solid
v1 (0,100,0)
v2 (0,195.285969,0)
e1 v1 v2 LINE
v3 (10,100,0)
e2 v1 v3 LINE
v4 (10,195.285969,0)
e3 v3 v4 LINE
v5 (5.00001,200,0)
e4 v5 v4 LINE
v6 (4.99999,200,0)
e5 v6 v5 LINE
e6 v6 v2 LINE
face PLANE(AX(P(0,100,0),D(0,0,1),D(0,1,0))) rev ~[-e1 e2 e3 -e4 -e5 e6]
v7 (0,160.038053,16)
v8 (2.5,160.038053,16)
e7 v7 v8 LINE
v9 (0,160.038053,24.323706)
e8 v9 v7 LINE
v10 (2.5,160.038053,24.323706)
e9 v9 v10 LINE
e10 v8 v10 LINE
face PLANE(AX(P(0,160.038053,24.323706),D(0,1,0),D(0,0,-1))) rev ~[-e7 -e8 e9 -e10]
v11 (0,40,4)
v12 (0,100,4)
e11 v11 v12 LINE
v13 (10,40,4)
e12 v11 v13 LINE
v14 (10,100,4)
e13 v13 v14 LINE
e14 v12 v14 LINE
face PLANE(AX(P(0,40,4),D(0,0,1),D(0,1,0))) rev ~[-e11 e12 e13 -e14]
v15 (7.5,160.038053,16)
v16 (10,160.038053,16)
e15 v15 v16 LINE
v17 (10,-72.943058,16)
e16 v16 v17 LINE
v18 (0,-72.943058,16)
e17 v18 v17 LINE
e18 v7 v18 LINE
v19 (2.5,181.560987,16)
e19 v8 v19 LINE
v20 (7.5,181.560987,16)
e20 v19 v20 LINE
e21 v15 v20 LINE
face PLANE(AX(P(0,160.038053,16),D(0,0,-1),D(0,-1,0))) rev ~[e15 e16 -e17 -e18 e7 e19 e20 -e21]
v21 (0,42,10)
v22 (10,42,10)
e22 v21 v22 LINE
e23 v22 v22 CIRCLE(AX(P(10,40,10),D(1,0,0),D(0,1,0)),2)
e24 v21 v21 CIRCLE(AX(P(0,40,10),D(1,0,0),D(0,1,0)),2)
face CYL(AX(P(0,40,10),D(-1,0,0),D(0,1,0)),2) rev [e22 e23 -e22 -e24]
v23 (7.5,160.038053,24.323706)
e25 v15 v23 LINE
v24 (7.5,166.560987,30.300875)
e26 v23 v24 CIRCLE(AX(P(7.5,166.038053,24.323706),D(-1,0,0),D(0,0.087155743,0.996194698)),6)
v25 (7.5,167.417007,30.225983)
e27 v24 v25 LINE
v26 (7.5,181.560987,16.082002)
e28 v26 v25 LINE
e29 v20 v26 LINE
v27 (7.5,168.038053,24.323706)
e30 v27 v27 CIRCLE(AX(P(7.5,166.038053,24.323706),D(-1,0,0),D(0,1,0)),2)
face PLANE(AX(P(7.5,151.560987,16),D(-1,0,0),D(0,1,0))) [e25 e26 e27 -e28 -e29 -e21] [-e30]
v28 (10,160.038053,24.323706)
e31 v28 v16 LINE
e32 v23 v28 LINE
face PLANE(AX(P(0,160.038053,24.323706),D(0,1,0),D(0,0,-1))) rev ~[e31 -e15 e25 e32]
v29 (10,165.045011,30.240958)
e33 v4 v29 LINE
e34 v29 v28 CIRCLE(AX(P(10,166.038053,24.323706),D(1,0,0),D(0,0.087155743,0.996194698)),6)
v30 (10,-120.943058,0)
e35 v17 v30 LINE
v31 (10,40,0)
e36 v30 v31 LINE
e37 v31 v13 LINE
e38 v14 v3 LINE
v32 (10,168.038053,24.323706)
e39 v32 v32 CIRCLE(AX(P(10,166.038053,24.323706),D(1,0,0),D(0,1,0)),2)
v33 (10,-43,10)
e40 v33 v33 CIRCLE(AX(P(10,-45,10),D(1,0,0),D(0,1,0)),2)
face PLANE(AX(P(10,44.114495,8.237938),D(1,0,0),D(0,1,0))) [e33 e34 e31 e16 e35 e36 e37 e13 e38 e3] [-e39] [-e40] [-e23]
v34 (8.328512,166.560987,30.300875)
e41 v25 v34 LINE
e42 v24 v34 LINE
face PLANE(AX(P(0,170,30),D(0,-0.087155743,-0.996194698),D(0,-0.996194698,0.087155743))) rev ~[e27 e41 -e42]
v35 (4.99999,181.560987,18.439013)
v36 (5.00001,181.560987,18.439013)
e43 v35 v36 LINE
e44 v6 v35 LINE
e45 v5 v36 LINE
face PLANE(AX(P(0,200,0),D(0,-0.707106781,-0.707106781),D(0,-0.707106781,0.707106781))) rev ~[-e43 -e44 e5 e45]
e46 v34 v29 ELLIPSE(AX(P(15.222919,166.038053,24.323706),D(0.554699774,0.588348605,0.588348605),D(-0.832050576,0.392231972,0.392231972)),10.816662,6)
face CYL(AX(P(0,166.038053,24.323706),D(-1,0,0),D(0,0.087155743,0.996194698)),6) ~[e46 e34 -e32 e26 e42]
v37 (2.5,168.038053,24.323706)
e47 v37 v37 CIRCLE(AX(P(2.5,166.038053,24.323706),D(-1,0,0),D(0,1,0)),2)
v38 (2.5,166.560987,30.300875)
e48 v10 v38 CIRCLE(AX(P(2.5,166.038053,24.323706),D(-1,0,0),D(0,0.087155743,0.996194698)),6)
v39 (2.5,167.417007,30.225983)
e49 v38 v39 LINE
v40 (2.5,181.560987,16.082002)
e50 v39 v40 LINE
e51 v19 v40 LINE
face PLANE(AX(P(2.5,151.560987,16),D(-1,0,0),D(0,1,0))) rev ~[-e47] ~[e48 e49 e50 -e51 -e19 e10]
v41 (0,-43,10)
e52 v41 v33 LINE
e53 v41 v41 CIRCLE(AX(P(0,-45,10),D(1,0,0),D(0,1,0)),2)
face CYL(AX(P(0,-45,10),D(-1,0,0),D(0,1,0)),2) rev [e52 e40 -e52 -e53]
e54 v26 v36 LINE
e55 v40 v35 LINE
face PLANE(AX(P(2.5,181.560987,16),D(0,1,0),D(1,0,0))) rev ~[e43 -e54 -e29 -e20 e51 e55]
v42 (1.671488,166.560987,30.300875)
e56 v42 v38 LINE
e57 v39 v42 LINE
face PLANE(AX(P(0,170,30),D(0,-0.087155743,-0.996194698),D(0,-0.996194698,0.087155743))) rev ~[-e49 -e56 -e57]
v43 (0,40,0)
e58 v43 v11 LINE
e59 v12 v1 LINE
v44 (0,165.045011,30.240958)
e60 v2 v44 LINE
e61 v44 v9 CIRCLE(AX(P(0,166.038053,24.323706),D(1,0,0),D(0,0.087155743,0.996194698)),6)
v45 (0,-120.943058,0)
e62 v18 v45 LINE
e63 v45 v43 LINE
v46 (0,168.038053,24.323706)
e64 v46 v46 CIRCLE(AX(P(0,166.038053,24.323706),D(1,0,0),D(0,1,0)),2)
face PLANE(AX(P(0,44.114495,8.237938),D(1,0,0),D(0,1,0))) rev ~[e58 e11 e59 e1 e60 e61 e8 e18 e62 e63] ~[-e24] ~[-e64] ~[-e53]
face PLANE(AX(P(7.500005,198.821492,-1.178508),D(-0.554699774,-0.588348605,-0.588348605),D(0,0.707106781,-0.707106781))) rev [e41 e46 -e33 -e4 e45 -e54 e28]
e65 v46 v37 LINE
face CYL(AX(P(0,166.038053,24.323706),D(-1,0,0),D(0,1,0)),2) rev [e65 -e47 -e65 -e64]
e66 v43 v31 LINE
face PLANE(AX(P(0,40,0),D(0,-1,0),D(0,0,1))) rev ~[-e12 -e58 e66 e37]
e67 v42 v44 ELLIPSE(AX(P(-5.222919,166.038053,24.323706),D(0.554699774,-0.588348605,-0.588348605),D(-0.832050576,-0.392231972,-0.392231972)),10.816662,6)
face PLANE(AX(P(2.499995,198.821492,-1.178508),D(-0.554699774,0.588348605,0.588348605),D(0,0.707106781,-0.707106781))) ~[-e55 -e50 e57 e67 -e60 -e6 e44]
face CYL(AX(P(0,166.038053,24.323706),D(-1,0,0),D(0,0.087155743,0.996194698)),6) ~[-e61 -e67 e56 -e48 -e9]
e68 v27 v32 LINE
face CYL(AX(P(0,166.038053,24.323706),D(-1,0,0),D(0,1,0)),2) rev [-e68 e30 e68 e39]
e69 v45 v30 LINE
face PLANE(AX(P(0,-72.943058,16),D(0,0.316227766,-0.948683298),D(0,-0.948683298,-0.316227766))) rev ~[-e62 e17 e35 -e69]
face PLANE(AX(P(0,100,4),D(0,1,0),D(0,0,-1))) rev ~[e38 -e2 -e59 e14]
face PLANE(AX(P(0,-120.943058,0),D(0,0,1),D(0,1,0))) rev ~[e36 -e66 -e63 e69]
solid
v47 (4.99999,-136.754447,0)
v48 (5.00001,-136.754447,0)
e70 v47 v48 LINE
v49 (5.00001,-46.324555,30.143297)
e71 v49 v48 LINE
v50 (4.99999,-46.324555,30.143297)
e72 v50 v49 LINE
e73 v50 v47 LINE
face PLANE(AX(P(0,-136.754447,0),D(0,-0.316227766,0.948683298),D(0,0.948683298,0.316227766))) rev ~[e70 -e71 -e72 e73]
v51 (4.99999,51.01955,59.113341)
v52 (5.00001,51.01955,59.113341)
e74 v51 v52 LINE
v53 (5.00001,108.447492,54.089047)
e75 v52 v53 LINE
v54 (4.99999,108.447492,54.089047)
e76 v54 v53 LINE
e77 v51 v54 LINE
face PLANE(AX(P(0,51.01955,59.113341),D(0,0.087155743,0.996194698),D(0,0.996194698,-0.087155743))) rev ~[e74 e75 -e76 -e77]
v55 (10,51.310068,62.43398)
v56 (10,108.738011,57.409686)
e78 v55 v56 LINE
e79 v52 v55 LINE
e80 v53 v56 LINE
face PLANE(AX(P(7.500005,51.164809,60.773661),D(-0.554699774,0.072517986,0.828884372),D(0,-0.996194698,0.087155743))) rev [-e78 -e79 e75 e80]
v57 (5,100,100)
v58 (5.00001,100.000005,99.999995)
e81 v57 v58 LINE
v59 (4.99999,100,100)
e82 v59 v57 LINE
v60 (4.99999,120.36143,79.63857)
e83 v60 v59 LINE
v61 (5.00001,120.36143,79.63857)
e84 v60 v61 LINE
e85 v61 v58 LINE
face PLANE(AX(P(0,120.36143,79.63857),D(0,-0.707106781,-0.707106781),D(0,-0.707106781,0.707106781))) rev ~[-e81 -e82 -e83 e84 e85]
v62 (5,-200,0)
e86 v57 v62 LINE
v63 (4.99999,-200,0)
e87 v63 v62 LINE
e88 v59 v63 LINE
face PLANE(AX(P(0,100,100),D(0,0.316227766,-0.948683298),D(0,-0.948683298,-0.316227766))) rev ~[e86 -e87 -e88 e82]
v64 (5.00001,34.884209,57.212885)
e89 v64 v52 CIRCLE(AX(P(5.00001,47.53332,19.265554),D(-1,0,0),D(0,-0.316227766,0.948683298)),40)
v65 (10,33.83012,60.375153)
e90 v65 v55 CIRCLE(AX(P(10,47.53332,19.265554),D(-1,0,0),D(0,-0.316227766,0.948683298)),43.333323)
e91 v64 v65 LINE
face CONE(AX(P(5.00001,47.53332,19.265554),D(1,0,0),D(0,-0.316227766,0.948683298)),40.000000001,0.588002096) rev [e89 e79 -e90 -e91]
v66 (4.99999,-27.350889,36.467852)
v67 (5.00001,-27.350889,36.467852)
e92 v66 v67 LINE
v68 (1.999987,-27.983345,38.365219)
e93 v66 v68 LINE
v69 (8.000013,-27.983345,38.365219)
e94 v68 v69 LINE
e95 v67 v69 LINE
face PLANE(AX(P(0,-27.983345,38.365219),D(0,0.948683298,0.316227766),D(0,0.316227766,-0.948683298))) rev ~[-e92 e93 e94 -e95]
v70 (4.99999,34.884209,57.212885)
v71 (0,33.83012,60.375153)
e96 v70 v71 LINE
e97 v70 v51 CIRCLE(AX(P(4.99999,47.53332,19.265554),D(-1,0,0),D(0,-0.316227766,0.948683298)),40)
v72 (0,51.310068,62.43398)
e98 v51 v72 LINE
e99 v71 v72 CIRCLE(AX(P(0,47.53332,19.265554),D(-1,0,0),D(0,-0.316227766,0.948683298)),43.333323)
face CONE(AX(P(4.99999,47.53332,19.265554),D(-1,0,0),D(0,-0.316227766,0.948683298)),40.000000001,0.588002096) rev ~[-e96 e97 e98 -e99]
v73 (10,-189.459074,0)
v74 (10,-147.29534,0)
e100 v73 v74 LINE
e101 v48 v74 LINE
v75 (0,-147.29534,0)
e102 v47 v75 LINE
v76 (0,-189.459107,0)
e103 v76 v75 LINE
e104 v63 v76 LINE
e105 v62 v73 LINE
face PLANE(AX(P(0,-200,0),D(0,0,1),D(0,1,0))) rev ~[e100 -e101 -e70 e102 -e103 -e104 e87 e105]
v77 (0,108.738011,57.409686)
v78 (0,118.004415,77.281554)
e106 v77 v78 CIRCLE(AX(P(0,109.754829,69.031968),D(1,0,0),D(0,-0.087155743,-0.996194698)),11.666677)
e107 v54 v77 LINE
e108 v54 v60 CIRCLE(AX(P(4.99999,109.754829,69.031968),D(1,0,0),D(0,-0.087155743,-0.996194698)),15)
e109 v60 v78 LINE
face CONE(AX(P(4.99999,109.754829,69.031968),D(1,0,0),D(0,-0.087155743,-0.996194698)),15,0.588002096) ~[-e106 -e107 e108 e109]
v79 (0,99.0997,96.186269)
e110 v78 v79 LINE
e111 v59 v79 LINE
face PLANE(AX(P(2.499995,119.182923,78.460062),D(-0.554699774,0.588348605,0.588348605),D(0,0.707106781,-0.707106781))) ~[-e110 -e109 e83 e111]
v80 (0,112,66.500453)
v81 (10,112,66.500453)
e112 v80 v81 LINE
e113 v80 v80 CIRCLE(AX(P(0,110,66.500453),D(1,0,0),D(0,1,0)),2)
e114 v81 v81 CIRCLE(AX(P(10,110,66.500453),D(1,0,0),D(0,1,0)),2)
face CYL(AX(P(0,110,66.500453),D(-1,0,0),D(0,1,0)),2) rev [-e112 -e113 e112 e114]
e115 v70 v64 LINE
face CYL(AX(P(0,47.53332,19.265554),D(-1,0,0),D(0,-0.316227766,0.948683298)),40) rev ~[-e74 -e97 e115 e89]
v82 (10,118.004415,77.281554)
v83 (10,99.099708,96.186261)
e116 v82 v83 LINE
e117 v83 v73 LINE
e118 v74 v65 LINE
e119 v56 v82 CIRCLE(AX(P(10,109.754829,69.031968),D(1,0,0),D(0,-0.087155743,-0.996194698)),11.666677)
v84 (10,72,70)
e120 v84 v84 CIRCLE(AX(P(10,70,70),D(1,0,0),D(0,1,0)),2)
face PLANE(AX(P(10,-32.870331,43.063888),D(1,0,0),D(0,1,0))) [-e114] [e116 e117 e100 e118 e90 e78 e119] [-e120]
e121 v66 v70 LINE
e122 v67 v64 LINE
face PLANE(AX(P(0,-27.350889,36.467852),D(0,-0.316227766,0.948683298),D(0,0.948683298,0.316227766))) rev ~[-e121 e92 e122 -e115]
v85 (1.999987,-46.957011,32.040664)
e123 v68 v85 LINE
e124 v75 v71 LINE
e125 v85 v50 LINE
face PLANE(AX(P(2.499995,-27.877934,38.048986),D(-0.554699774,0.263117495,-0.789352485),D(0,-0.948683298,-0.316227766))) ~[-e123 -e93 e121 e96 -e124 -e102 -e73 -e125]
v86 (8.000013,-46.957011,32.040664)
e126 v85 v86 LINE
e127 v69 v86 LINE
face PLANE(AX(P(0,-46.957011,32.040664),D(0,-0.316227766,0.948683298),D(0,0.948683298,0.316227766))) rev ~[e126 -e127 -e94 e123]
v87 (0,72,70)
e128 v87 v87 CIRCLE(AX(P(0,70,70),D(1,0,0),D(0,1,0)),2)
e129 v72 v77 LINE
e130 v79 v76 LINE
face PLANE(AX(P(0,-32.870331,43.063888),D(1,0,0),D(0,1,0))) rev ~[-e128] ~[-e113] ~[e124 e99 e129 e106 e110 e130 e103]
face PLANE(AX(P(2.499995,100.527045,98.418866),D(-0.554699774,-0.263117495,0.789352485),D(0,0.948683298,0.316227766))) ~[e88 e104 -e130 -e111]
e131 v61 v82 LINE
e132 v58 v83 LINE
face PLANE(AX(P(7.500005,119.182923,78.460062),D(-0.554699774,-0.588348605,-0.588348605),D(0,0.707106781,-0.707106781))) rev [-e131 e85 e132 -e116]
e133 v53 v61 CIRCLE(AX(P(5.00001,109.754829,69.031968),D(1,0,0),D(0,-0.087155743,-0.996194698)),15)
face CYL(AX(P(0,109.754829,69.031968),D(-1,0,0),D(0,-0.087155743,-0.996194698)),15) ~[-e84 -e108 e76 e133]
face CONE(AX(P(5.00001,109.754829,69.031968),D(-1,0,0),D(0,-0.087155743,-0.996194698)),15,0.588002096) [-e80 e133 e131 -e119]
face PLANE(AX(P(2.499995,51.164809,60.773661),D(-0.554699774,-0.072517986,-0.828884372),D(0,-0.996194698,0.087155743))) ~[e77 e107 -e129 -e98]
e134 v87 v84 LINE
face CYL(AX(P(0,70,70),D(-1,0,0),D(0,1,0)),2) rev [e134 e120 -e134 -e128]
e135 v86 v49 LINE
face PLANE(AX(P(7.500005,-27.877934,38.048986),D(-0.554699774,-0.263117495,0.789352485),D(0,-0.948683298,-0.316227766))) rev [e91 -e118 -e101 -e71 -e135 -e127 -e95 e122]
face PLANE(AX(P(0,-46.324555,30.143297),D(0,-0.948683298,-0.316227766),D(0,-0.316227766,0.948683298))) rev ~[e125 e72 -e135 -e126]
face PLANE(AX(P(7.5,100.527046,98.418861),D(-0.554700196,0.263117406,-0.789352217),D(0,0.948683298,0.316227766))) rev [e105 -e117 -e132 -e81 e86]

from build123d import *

# Parameters (mm, degrees)
F0_R     = 2
F1_DEPTH = 10
F2_DEPTH = 10
F3_SIZE2 = 3.3333333338
F3_SIZE  = 5
F4_SIZE2 = 3.333323
F4_SIZE  = 4.99999
F5_SIZE2 = 3.333323
F5_SIZE  = 4.99999
F6_SIZE2 = 3.333323
F6_SIZE  = 4.99999
F7_W     = 5
F7_H     = 30
F8_DEPTH = 25


# Not quite as in the source:
# - a fillet or chamfer is up to 0.001 mm smaller than in the source, because OpenCascade refuses the exact size


with BuildPart() as f1:
    # F0 (on Right) → F1 (new body)
    with BuildSketch(Plane.YZ):
        with BuildLine():
            Line((120.3614303264, 79.6385696736), (100, 100))
            Line((100, 100), (-200, 0))
            Line((-200, 0), (-136.7544467966, 0))
            Line((-136.7544467966, 0), (-46.3245553203, 30.1432971588))
            Line((-46.3245553203, 30.1432971588), (-46.9570108524, 32.0406637549))
            Line((-46.9570108524, 32.0406637549), (-27.9833448914, 38.3652190752))
            Line((-27.9833448914, 38.3652190752), (-27.3508893593, 36.4678524791))
            Line((-27.3508893593, 36.4678524791), (34.884209498, 57.2128854315))
            ThreePointArc((34.884209498, 57.2128854315), (42.8543747456, 58.9909543257), (51.0195498486, 59.1133414332))
            Line((51.0195498486, 59.1133414332), (108.4474924674, 54.0890474844))
            ThreePointArc((108.4474924674, 54.0890474844), (123.3494454141, 62.6926940297), (120.3614303264, 79.6385696736))
        make_face()
        with Locations((70, 70)):
            Circle(F0_R, mode=Mode.SUBTRACT)
        with Locations((110, 66.500453459)):
            Circle(F0_R, mode=Mode.SUBTRACT)
    extrude(amount=F1_DEPTH)

    # F3
    f3_edges = [f1.edges().sort_by_distance(p)[0] for p in [
        (10, -50, 50),
    ]]
    f3_side = f1.faces().sort_by_distance((5, -50, 50))[0]
    chamfer(f3_edges, length=F3_SIZE, length2=F3_SIZE2, reference=f3_side)

    # F4 (size 5 and 3.3333333338 in the source; OpenCascade refuses exactly that, so slightly less here)
    f4_edges = [f1.edges().sort_by_distance(p)[0] for p in [
        (0, -50, 50),
    ]]
    f4_side = f1.faces().sort_by_distance((2.5, -50, 50))[0]
    chamfer(f4_edges, length=F4_SIZE, length2=F4_SIZE2, reference=f4_side)

    # F5 (size 5 and 3.3333333338 in the source; OpenCascade refuses exactly that, so slightly less here)
    f5_edges = [f1.edges().sort_by_distance(p)[0] for p in [
        (0, 111.498327, 88.501673),
        (10, 111.498331, 88.501669),
    ]]
    f5_side = f1.faces().sort_by_distance((5, 110.824327, 89.175673))[0]
    chamfer(f5_edges, length=F5_SIZE, length2=F5_SIZE2, reference=f5_side)


with BuildPart() as f2:
    # F0 (on Right) → F2 (new body)
    with BuildSketch(Plane.YZ):
        with BuildLine():
            Line((-72.9430584958, 16), (-120.9430584958, 0))
            Line((-120.9430584958, 0), (40, 0))
            Line((40, 0), (40, 4))
            Line((40, 4), (100, 4))
            Line((100, 4), (100, 0))
            Line((100, 0), (200, 0))
            Line((200, 0), (170, 30))
            Line((170, 30), (166.5609874756, 30.3008746096))
            ThreePointArc((166.5609874756, 30.3008746096), (161.9845117734, 28.7473704419), (160.0380530191, 24.3237064211))
            Line((160.0380530191, 24.3237064211), (160.0380530191, 16))
            Line((160.0380530191, 16), (-72.9430584958, 16))
        make_face()
        with Locations((-45, 10)):
            Circle(F0_R, mode=Mode.SUBTRACT)
        with Locations((40, 10)):
            Circle(F0_R, mode=Mode.SUBTRACT)
        with Locations((166.0380530191, 24.3237064211)):
            Circle(F0_R, mode=Mode.SUBTRACT)
    extrude(amount=F2_DEPTH)

    # F6 (size 5 and 3.3333333338 in the source; OpenCascade refuses exactly that, so slightly less here)
    f6_edges = [f2.edges().sort_by_distance(p)[0] for p in [
        (0, 185, 15),
        (10, 185, 15),
    ]]
    f6_side = f2.faces().sort_by_distance((5, 185, 15))[0]
    chamfer(f6_edges, length=F6_SIZE, length2=F6_SIZE2, reference=f6_side)

    # F7 (on face) → F8 (cut)
    with BuildSketch(Plane.XY.offset(16)):
        with Locations((5, 166.5609874756)):
            Rectangle(F7_W, F7_H)
    extrude(amount=F8_DEPTH, mode=Mode.SUBTRACT)


solid = Compound([f1.part, f2.part])
